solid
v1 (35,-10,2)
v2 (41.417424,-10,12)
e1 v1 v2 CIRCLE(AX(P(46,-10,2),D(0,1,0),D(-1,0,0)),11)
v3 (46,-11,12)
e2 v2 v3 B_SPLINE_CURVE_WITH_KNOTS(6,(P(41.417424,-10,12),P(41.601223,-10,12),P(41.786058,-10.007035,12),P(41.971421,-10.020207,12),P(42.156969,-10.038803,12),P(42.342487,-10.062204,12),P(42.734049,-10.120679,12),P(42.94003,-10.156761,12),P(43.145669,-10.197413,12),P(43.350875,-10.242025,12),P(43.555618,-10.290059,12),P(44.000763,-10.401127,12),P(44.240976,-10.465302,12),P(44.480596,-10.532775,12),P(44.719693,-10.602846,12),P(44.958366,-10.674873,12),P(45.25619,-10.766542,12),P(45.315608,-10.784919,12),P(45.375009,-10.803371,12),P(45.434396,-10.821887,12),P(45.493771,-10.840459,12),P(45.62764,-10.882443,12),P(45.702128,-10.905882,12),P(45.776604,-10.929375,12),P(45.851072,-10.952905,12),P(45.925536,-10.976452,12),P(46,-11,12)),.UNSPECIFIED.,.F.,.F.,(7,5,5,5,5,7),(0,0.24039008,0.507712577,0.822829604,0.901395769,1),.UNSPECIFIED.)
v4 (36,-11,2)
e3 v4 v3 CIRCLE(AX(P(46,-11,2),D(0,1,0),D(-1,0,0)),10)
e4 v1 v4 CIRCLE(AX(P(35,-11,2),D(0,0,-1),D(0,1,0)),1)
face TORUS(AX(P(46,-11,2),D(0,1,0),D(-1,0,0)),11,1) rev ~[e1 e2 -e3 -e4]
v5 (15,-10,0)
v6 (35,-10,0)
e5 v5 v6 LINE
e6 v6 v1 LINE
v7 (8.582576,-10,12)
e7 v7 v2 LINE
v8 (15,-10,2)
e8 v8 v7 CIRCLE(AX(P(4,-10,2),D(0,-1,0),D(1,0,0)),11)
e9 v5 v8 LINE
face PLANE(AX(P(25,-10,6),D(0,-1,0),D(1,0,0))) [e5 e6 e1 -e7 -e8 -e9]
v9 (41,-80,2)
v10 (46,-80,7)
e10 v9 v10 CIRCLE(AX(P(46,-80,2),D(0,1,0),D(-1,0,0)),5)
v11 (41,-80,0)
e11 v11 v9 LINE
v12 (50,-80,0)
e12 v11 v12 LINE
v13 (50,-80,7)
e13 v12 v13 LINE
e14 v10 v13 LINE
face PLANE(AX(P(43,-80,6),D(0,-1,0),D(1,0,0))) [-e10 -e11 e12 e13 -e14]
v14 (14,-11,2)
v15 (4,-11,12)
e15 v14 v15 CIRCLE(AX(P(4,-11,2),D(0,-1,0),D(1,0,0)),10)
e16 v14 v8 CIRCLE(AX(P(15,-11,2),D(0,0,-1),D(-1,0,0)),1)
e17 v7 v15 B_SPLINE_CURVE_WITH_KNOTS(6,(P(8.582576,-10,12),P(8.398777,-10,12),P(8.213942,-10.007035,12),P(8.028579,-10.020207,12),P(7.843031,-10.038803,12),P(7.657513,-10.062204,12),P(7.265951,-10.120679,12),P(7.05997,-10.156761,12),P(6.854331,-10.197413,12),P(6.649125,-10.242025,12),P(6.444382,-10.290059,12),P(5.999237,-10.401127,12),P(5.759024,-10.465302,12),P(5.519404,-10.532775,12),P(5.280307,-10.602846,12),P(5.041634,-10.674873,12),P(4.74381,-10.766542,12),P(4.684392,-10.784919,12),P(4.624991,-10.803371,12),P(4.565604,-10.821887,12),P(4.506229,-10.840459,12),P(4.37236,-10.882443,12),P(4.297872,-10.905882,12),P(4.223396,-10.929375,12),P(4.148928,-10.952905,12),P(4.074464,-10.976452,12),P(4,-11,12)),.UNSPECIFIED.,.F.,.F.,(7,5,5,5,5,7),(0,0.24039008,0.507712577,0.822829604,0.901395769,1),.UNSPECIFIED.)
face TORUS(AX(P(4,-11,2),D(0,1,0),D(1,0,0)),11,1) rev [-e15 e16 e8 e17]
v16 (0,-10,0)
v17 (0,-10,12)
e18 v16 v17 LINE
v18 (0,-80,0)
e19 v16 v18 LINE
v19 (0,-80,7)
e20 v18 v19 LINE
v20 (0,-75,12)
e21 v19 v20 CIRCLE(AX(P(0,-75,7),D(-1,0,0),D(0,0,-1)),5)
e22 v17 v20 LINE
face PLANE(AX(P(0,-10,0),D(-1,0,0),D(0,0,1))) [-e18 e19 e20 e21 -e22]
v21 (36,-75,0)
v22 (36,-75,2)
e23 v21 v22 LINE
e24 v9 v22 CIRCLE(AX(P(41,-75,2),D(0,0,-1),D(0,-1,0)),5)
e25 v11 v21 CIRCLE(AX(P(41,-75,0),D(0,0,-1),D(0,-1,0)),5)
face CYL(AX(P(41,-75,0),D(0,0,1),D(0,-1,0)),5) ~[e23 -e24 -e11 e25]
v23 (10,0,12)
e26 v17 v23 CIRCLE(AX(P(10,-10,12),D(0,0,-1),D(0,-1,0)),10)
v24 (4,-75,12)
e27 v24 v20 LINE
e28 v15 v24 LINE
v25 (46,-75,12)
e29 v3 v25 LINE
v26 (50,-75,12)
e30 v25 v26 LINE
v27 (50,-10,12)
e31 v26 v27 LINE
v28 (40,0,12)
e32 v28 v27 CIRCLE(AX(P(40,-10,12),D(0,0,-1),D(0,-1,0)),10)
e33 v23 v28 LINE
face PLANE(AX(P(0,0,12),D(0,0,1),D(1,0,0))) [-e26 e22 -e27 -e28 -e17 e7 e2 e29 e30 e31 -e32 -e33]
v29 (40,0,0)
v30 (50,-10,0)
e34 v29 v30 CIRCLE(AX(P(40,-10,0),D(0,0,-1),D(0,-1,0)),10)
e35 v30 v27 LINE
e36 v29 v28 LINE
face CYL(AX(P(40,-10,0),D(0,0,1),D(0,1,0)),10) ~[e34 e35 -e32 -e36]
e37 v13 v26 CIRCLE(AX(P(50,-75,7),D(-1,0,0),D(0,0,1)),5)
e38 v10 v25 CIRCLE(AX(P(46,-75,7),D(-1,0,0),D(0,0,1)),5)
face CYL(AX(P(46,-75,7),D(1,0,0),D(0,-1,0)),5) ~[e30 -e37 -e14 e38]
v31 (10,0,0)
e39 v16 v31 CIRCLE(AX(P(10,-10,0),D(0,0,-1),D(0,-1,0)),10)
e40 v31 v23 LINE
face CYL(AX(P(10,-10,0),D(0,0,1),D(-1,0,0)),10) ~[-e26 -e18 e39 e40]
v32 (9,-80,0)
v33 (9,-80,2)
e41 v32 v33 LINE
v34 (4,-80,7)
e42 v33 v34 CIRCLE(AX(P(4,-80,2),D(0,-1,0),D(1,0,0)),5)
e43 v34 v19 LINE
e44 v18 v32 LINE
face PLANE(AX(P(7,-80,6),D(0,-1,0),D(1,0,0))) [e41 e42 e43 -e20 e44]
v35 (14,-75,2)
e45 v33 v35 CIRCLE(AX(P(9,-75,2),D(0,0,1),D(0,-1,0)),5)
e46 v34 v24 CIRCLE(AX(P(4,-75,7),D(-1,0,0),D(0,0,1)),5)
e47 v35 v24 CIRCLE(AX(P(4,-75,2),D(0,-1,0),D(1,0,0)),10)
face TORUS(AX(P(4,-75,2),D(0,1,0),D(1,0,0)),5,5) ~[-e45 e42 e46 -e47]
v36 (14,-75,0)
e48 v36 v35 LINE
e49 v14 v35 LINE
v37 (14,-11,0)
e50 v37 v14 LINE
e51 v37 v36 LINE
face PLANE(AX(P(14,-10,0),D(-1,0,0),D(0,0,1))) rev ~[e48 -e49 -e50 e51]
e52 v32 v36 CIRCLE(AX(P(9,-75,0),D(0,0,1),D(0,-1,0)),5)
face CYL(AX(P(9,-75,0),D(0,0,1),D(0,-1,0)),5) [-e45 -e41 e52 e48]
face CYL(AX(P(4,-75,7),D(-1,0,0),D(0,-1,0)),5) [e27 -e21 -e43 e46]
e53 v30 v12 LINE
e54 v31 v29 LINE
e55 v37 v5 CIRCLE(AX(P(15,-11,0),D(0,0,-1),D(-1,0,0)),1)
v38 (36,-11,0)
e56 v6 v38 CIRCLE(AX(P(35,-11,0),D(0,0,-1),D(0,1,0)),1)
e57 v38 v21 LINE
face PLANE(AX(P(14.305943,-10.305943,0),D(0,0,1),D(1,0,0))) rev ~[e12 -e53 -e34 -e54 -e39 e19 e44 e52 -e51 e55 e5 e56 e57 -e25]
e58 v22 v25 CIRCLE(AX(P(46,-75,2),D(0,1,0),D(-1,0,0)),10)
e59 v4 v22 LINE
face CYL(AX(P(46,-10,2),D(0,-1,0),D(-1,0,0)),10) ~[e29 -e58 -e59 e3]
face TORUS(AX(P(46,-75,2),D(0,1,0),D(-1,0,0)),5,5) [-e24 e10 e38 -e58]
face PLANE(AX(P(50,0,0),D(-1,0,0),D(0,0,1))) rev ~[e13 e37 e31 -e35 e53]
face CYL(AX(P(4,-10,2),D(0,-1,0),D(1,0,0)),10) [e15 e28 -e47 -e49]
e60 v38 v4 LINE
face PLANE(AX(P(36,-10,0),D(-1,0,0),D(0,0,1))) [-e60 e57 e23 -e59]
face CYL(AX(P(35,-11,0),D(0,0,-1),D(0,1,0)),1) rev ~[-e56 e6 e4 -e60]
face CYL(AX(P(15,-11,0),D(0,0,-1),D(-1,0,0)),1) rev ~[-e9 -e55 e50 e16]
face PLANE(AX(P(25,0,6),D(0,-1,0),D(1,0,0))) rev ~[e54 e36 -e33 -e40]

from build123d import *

# Parameters (mm, degrees)
F0_W         = 50
F0_H         = 12
F1_DEPTH     = 10
F2_W         = 14
F2_H         = 12
F3_DEPTH     = 70
F4_R         = 10
F5_R         = 5
F6_T1_DEPTH  = 2
F6_T6_ANGLE  = 132.9890967712
F6_T12_ANGLE = 132.9890967712
F7_R         = 10


# Not quite as in the source:
# - a fillet or chamfer that OpenCascade refuses, or shapes differently, is made with other operations: its cross-section is extruded or revolved along the edge and cut away or added


with BuildPart() as f1:
    # F0 (on Front) → F1 (new body)
    with BuildSketch(Plane.XZ):
        with Locations((25, 6)):
            Rectangle(F0_W, F0_H)
    extrude(amount=F1_DEPTH)

    # F2 (on face) → F3 (join)
    with BuildSketch(Plane.XZ.offset(10)):
        with Locations((7, 6)):
            Rectangle(F2_W, F2_H)
        with Locations((43, 6)):
            Rectangle(F2_W, F2_H)
    extrude(amount=F3_DEPTH)

    # F4
    f4_edges = [f1.edges().sort_by_distance(p)[0] for p in [
        (14, -45, 12),
        (36, -45, 12),
    ]]
    fillet(f4_edges, radius=F4_R)

    # F5
    f5_edges = [f1.edges().sort_by_distance(p)[0] for p in [
        (11.071068, -80, 9.071068),
        (38.928932, -80, 9.071068),
        (48, -80, 12),
        (36, -80, 1),
        (2, -80, 12),
        (14, -80, 1),
    ]]
    fillet(f5_edges, radius=F5_R)

    # F6: fillet of radius 1 on 4 edges, made by hand

    # F6_s2 → F6_t1 (join)
    with BuildSketch(Plane.XY):
        with BuildLine():
            ThreePointArc((14, -11), (14.2928932188, -10.2928932188), (15, -10))
            Line((15, -10), (14, -10))
            Line((14, -10), (14, -11))
        make_face()
        with BuildLine():
            ThreePointArc((35, -10), (35.7071067812, -10.2928932188), (36, -11))
            Line((36, -11), (36, -10))
            Line((36, -10), (35, -10))
        make_face()
    extrude(amount=F6_T1_DEPTH)


with BuildPart() as f6_tool4:
    # F6_s5 → F6_t6 (revolve)
    with BuildSketch(Plane.XY.offset(2)):
        with BuildLine():
            ThreePointArc((15, -10), (14.2928932188, -10.2928932188), (14, -11))
            Line((14, -11), (14, -10))
            Line((14, -10), (15, -10))
        make_face()
    revolve(axis=Axis((4, -10, 2), (0, -1, 0)), revolution_arc=F6_T6_ANGLE)

    split(bisect_by=Plane.XY.offset(12), keep=Keep.BOTTOM)

    split(bisect_by=Plane.YZ, keep=Keep.TOP)


with BuildPart() as f1_1:
    add(f1.part)

    # F6_t3: union F6_tool4
    add(f6_tool4.part)


with BuildPart() as f6_tool10:
    # F6_s11 → F6_t12 (revolve)
    with BuildSketch(Plane.XY.offset(2)):
        with BuildLine():
            ThreePointArc((35, -10), (35.7071067812, -10.2928932188), (36, -11))
            Line((36, -11), (36, -10))
            Line((36, -10), (35, -10))
        make_face()
    revolve(axis=Axis((46, -10, 2), (0, 1, 0)), revolution_arc=F6_T12_ANGLE)

    split(bisect_by=Plane.YZ.offset(50), keep=Keep.BOTTOM)

    split(bisect_by=Plane.XY.offset(12), keep=Keep.BOTTOM)


with BuildPart() as f1_2:
    add(f1_1.part)

    # F6_t9: union F6_tool10
    add(f6_tool10.part)

    # F7
    f7_edges = [f1_2.edges().sort_by_distance(p)[0] for p in [
        (50, 0, 6),
        (0, 0, 6),
    ]]
    fillet(f7_edges, radius=F7_R)


solid = f1_2.part
